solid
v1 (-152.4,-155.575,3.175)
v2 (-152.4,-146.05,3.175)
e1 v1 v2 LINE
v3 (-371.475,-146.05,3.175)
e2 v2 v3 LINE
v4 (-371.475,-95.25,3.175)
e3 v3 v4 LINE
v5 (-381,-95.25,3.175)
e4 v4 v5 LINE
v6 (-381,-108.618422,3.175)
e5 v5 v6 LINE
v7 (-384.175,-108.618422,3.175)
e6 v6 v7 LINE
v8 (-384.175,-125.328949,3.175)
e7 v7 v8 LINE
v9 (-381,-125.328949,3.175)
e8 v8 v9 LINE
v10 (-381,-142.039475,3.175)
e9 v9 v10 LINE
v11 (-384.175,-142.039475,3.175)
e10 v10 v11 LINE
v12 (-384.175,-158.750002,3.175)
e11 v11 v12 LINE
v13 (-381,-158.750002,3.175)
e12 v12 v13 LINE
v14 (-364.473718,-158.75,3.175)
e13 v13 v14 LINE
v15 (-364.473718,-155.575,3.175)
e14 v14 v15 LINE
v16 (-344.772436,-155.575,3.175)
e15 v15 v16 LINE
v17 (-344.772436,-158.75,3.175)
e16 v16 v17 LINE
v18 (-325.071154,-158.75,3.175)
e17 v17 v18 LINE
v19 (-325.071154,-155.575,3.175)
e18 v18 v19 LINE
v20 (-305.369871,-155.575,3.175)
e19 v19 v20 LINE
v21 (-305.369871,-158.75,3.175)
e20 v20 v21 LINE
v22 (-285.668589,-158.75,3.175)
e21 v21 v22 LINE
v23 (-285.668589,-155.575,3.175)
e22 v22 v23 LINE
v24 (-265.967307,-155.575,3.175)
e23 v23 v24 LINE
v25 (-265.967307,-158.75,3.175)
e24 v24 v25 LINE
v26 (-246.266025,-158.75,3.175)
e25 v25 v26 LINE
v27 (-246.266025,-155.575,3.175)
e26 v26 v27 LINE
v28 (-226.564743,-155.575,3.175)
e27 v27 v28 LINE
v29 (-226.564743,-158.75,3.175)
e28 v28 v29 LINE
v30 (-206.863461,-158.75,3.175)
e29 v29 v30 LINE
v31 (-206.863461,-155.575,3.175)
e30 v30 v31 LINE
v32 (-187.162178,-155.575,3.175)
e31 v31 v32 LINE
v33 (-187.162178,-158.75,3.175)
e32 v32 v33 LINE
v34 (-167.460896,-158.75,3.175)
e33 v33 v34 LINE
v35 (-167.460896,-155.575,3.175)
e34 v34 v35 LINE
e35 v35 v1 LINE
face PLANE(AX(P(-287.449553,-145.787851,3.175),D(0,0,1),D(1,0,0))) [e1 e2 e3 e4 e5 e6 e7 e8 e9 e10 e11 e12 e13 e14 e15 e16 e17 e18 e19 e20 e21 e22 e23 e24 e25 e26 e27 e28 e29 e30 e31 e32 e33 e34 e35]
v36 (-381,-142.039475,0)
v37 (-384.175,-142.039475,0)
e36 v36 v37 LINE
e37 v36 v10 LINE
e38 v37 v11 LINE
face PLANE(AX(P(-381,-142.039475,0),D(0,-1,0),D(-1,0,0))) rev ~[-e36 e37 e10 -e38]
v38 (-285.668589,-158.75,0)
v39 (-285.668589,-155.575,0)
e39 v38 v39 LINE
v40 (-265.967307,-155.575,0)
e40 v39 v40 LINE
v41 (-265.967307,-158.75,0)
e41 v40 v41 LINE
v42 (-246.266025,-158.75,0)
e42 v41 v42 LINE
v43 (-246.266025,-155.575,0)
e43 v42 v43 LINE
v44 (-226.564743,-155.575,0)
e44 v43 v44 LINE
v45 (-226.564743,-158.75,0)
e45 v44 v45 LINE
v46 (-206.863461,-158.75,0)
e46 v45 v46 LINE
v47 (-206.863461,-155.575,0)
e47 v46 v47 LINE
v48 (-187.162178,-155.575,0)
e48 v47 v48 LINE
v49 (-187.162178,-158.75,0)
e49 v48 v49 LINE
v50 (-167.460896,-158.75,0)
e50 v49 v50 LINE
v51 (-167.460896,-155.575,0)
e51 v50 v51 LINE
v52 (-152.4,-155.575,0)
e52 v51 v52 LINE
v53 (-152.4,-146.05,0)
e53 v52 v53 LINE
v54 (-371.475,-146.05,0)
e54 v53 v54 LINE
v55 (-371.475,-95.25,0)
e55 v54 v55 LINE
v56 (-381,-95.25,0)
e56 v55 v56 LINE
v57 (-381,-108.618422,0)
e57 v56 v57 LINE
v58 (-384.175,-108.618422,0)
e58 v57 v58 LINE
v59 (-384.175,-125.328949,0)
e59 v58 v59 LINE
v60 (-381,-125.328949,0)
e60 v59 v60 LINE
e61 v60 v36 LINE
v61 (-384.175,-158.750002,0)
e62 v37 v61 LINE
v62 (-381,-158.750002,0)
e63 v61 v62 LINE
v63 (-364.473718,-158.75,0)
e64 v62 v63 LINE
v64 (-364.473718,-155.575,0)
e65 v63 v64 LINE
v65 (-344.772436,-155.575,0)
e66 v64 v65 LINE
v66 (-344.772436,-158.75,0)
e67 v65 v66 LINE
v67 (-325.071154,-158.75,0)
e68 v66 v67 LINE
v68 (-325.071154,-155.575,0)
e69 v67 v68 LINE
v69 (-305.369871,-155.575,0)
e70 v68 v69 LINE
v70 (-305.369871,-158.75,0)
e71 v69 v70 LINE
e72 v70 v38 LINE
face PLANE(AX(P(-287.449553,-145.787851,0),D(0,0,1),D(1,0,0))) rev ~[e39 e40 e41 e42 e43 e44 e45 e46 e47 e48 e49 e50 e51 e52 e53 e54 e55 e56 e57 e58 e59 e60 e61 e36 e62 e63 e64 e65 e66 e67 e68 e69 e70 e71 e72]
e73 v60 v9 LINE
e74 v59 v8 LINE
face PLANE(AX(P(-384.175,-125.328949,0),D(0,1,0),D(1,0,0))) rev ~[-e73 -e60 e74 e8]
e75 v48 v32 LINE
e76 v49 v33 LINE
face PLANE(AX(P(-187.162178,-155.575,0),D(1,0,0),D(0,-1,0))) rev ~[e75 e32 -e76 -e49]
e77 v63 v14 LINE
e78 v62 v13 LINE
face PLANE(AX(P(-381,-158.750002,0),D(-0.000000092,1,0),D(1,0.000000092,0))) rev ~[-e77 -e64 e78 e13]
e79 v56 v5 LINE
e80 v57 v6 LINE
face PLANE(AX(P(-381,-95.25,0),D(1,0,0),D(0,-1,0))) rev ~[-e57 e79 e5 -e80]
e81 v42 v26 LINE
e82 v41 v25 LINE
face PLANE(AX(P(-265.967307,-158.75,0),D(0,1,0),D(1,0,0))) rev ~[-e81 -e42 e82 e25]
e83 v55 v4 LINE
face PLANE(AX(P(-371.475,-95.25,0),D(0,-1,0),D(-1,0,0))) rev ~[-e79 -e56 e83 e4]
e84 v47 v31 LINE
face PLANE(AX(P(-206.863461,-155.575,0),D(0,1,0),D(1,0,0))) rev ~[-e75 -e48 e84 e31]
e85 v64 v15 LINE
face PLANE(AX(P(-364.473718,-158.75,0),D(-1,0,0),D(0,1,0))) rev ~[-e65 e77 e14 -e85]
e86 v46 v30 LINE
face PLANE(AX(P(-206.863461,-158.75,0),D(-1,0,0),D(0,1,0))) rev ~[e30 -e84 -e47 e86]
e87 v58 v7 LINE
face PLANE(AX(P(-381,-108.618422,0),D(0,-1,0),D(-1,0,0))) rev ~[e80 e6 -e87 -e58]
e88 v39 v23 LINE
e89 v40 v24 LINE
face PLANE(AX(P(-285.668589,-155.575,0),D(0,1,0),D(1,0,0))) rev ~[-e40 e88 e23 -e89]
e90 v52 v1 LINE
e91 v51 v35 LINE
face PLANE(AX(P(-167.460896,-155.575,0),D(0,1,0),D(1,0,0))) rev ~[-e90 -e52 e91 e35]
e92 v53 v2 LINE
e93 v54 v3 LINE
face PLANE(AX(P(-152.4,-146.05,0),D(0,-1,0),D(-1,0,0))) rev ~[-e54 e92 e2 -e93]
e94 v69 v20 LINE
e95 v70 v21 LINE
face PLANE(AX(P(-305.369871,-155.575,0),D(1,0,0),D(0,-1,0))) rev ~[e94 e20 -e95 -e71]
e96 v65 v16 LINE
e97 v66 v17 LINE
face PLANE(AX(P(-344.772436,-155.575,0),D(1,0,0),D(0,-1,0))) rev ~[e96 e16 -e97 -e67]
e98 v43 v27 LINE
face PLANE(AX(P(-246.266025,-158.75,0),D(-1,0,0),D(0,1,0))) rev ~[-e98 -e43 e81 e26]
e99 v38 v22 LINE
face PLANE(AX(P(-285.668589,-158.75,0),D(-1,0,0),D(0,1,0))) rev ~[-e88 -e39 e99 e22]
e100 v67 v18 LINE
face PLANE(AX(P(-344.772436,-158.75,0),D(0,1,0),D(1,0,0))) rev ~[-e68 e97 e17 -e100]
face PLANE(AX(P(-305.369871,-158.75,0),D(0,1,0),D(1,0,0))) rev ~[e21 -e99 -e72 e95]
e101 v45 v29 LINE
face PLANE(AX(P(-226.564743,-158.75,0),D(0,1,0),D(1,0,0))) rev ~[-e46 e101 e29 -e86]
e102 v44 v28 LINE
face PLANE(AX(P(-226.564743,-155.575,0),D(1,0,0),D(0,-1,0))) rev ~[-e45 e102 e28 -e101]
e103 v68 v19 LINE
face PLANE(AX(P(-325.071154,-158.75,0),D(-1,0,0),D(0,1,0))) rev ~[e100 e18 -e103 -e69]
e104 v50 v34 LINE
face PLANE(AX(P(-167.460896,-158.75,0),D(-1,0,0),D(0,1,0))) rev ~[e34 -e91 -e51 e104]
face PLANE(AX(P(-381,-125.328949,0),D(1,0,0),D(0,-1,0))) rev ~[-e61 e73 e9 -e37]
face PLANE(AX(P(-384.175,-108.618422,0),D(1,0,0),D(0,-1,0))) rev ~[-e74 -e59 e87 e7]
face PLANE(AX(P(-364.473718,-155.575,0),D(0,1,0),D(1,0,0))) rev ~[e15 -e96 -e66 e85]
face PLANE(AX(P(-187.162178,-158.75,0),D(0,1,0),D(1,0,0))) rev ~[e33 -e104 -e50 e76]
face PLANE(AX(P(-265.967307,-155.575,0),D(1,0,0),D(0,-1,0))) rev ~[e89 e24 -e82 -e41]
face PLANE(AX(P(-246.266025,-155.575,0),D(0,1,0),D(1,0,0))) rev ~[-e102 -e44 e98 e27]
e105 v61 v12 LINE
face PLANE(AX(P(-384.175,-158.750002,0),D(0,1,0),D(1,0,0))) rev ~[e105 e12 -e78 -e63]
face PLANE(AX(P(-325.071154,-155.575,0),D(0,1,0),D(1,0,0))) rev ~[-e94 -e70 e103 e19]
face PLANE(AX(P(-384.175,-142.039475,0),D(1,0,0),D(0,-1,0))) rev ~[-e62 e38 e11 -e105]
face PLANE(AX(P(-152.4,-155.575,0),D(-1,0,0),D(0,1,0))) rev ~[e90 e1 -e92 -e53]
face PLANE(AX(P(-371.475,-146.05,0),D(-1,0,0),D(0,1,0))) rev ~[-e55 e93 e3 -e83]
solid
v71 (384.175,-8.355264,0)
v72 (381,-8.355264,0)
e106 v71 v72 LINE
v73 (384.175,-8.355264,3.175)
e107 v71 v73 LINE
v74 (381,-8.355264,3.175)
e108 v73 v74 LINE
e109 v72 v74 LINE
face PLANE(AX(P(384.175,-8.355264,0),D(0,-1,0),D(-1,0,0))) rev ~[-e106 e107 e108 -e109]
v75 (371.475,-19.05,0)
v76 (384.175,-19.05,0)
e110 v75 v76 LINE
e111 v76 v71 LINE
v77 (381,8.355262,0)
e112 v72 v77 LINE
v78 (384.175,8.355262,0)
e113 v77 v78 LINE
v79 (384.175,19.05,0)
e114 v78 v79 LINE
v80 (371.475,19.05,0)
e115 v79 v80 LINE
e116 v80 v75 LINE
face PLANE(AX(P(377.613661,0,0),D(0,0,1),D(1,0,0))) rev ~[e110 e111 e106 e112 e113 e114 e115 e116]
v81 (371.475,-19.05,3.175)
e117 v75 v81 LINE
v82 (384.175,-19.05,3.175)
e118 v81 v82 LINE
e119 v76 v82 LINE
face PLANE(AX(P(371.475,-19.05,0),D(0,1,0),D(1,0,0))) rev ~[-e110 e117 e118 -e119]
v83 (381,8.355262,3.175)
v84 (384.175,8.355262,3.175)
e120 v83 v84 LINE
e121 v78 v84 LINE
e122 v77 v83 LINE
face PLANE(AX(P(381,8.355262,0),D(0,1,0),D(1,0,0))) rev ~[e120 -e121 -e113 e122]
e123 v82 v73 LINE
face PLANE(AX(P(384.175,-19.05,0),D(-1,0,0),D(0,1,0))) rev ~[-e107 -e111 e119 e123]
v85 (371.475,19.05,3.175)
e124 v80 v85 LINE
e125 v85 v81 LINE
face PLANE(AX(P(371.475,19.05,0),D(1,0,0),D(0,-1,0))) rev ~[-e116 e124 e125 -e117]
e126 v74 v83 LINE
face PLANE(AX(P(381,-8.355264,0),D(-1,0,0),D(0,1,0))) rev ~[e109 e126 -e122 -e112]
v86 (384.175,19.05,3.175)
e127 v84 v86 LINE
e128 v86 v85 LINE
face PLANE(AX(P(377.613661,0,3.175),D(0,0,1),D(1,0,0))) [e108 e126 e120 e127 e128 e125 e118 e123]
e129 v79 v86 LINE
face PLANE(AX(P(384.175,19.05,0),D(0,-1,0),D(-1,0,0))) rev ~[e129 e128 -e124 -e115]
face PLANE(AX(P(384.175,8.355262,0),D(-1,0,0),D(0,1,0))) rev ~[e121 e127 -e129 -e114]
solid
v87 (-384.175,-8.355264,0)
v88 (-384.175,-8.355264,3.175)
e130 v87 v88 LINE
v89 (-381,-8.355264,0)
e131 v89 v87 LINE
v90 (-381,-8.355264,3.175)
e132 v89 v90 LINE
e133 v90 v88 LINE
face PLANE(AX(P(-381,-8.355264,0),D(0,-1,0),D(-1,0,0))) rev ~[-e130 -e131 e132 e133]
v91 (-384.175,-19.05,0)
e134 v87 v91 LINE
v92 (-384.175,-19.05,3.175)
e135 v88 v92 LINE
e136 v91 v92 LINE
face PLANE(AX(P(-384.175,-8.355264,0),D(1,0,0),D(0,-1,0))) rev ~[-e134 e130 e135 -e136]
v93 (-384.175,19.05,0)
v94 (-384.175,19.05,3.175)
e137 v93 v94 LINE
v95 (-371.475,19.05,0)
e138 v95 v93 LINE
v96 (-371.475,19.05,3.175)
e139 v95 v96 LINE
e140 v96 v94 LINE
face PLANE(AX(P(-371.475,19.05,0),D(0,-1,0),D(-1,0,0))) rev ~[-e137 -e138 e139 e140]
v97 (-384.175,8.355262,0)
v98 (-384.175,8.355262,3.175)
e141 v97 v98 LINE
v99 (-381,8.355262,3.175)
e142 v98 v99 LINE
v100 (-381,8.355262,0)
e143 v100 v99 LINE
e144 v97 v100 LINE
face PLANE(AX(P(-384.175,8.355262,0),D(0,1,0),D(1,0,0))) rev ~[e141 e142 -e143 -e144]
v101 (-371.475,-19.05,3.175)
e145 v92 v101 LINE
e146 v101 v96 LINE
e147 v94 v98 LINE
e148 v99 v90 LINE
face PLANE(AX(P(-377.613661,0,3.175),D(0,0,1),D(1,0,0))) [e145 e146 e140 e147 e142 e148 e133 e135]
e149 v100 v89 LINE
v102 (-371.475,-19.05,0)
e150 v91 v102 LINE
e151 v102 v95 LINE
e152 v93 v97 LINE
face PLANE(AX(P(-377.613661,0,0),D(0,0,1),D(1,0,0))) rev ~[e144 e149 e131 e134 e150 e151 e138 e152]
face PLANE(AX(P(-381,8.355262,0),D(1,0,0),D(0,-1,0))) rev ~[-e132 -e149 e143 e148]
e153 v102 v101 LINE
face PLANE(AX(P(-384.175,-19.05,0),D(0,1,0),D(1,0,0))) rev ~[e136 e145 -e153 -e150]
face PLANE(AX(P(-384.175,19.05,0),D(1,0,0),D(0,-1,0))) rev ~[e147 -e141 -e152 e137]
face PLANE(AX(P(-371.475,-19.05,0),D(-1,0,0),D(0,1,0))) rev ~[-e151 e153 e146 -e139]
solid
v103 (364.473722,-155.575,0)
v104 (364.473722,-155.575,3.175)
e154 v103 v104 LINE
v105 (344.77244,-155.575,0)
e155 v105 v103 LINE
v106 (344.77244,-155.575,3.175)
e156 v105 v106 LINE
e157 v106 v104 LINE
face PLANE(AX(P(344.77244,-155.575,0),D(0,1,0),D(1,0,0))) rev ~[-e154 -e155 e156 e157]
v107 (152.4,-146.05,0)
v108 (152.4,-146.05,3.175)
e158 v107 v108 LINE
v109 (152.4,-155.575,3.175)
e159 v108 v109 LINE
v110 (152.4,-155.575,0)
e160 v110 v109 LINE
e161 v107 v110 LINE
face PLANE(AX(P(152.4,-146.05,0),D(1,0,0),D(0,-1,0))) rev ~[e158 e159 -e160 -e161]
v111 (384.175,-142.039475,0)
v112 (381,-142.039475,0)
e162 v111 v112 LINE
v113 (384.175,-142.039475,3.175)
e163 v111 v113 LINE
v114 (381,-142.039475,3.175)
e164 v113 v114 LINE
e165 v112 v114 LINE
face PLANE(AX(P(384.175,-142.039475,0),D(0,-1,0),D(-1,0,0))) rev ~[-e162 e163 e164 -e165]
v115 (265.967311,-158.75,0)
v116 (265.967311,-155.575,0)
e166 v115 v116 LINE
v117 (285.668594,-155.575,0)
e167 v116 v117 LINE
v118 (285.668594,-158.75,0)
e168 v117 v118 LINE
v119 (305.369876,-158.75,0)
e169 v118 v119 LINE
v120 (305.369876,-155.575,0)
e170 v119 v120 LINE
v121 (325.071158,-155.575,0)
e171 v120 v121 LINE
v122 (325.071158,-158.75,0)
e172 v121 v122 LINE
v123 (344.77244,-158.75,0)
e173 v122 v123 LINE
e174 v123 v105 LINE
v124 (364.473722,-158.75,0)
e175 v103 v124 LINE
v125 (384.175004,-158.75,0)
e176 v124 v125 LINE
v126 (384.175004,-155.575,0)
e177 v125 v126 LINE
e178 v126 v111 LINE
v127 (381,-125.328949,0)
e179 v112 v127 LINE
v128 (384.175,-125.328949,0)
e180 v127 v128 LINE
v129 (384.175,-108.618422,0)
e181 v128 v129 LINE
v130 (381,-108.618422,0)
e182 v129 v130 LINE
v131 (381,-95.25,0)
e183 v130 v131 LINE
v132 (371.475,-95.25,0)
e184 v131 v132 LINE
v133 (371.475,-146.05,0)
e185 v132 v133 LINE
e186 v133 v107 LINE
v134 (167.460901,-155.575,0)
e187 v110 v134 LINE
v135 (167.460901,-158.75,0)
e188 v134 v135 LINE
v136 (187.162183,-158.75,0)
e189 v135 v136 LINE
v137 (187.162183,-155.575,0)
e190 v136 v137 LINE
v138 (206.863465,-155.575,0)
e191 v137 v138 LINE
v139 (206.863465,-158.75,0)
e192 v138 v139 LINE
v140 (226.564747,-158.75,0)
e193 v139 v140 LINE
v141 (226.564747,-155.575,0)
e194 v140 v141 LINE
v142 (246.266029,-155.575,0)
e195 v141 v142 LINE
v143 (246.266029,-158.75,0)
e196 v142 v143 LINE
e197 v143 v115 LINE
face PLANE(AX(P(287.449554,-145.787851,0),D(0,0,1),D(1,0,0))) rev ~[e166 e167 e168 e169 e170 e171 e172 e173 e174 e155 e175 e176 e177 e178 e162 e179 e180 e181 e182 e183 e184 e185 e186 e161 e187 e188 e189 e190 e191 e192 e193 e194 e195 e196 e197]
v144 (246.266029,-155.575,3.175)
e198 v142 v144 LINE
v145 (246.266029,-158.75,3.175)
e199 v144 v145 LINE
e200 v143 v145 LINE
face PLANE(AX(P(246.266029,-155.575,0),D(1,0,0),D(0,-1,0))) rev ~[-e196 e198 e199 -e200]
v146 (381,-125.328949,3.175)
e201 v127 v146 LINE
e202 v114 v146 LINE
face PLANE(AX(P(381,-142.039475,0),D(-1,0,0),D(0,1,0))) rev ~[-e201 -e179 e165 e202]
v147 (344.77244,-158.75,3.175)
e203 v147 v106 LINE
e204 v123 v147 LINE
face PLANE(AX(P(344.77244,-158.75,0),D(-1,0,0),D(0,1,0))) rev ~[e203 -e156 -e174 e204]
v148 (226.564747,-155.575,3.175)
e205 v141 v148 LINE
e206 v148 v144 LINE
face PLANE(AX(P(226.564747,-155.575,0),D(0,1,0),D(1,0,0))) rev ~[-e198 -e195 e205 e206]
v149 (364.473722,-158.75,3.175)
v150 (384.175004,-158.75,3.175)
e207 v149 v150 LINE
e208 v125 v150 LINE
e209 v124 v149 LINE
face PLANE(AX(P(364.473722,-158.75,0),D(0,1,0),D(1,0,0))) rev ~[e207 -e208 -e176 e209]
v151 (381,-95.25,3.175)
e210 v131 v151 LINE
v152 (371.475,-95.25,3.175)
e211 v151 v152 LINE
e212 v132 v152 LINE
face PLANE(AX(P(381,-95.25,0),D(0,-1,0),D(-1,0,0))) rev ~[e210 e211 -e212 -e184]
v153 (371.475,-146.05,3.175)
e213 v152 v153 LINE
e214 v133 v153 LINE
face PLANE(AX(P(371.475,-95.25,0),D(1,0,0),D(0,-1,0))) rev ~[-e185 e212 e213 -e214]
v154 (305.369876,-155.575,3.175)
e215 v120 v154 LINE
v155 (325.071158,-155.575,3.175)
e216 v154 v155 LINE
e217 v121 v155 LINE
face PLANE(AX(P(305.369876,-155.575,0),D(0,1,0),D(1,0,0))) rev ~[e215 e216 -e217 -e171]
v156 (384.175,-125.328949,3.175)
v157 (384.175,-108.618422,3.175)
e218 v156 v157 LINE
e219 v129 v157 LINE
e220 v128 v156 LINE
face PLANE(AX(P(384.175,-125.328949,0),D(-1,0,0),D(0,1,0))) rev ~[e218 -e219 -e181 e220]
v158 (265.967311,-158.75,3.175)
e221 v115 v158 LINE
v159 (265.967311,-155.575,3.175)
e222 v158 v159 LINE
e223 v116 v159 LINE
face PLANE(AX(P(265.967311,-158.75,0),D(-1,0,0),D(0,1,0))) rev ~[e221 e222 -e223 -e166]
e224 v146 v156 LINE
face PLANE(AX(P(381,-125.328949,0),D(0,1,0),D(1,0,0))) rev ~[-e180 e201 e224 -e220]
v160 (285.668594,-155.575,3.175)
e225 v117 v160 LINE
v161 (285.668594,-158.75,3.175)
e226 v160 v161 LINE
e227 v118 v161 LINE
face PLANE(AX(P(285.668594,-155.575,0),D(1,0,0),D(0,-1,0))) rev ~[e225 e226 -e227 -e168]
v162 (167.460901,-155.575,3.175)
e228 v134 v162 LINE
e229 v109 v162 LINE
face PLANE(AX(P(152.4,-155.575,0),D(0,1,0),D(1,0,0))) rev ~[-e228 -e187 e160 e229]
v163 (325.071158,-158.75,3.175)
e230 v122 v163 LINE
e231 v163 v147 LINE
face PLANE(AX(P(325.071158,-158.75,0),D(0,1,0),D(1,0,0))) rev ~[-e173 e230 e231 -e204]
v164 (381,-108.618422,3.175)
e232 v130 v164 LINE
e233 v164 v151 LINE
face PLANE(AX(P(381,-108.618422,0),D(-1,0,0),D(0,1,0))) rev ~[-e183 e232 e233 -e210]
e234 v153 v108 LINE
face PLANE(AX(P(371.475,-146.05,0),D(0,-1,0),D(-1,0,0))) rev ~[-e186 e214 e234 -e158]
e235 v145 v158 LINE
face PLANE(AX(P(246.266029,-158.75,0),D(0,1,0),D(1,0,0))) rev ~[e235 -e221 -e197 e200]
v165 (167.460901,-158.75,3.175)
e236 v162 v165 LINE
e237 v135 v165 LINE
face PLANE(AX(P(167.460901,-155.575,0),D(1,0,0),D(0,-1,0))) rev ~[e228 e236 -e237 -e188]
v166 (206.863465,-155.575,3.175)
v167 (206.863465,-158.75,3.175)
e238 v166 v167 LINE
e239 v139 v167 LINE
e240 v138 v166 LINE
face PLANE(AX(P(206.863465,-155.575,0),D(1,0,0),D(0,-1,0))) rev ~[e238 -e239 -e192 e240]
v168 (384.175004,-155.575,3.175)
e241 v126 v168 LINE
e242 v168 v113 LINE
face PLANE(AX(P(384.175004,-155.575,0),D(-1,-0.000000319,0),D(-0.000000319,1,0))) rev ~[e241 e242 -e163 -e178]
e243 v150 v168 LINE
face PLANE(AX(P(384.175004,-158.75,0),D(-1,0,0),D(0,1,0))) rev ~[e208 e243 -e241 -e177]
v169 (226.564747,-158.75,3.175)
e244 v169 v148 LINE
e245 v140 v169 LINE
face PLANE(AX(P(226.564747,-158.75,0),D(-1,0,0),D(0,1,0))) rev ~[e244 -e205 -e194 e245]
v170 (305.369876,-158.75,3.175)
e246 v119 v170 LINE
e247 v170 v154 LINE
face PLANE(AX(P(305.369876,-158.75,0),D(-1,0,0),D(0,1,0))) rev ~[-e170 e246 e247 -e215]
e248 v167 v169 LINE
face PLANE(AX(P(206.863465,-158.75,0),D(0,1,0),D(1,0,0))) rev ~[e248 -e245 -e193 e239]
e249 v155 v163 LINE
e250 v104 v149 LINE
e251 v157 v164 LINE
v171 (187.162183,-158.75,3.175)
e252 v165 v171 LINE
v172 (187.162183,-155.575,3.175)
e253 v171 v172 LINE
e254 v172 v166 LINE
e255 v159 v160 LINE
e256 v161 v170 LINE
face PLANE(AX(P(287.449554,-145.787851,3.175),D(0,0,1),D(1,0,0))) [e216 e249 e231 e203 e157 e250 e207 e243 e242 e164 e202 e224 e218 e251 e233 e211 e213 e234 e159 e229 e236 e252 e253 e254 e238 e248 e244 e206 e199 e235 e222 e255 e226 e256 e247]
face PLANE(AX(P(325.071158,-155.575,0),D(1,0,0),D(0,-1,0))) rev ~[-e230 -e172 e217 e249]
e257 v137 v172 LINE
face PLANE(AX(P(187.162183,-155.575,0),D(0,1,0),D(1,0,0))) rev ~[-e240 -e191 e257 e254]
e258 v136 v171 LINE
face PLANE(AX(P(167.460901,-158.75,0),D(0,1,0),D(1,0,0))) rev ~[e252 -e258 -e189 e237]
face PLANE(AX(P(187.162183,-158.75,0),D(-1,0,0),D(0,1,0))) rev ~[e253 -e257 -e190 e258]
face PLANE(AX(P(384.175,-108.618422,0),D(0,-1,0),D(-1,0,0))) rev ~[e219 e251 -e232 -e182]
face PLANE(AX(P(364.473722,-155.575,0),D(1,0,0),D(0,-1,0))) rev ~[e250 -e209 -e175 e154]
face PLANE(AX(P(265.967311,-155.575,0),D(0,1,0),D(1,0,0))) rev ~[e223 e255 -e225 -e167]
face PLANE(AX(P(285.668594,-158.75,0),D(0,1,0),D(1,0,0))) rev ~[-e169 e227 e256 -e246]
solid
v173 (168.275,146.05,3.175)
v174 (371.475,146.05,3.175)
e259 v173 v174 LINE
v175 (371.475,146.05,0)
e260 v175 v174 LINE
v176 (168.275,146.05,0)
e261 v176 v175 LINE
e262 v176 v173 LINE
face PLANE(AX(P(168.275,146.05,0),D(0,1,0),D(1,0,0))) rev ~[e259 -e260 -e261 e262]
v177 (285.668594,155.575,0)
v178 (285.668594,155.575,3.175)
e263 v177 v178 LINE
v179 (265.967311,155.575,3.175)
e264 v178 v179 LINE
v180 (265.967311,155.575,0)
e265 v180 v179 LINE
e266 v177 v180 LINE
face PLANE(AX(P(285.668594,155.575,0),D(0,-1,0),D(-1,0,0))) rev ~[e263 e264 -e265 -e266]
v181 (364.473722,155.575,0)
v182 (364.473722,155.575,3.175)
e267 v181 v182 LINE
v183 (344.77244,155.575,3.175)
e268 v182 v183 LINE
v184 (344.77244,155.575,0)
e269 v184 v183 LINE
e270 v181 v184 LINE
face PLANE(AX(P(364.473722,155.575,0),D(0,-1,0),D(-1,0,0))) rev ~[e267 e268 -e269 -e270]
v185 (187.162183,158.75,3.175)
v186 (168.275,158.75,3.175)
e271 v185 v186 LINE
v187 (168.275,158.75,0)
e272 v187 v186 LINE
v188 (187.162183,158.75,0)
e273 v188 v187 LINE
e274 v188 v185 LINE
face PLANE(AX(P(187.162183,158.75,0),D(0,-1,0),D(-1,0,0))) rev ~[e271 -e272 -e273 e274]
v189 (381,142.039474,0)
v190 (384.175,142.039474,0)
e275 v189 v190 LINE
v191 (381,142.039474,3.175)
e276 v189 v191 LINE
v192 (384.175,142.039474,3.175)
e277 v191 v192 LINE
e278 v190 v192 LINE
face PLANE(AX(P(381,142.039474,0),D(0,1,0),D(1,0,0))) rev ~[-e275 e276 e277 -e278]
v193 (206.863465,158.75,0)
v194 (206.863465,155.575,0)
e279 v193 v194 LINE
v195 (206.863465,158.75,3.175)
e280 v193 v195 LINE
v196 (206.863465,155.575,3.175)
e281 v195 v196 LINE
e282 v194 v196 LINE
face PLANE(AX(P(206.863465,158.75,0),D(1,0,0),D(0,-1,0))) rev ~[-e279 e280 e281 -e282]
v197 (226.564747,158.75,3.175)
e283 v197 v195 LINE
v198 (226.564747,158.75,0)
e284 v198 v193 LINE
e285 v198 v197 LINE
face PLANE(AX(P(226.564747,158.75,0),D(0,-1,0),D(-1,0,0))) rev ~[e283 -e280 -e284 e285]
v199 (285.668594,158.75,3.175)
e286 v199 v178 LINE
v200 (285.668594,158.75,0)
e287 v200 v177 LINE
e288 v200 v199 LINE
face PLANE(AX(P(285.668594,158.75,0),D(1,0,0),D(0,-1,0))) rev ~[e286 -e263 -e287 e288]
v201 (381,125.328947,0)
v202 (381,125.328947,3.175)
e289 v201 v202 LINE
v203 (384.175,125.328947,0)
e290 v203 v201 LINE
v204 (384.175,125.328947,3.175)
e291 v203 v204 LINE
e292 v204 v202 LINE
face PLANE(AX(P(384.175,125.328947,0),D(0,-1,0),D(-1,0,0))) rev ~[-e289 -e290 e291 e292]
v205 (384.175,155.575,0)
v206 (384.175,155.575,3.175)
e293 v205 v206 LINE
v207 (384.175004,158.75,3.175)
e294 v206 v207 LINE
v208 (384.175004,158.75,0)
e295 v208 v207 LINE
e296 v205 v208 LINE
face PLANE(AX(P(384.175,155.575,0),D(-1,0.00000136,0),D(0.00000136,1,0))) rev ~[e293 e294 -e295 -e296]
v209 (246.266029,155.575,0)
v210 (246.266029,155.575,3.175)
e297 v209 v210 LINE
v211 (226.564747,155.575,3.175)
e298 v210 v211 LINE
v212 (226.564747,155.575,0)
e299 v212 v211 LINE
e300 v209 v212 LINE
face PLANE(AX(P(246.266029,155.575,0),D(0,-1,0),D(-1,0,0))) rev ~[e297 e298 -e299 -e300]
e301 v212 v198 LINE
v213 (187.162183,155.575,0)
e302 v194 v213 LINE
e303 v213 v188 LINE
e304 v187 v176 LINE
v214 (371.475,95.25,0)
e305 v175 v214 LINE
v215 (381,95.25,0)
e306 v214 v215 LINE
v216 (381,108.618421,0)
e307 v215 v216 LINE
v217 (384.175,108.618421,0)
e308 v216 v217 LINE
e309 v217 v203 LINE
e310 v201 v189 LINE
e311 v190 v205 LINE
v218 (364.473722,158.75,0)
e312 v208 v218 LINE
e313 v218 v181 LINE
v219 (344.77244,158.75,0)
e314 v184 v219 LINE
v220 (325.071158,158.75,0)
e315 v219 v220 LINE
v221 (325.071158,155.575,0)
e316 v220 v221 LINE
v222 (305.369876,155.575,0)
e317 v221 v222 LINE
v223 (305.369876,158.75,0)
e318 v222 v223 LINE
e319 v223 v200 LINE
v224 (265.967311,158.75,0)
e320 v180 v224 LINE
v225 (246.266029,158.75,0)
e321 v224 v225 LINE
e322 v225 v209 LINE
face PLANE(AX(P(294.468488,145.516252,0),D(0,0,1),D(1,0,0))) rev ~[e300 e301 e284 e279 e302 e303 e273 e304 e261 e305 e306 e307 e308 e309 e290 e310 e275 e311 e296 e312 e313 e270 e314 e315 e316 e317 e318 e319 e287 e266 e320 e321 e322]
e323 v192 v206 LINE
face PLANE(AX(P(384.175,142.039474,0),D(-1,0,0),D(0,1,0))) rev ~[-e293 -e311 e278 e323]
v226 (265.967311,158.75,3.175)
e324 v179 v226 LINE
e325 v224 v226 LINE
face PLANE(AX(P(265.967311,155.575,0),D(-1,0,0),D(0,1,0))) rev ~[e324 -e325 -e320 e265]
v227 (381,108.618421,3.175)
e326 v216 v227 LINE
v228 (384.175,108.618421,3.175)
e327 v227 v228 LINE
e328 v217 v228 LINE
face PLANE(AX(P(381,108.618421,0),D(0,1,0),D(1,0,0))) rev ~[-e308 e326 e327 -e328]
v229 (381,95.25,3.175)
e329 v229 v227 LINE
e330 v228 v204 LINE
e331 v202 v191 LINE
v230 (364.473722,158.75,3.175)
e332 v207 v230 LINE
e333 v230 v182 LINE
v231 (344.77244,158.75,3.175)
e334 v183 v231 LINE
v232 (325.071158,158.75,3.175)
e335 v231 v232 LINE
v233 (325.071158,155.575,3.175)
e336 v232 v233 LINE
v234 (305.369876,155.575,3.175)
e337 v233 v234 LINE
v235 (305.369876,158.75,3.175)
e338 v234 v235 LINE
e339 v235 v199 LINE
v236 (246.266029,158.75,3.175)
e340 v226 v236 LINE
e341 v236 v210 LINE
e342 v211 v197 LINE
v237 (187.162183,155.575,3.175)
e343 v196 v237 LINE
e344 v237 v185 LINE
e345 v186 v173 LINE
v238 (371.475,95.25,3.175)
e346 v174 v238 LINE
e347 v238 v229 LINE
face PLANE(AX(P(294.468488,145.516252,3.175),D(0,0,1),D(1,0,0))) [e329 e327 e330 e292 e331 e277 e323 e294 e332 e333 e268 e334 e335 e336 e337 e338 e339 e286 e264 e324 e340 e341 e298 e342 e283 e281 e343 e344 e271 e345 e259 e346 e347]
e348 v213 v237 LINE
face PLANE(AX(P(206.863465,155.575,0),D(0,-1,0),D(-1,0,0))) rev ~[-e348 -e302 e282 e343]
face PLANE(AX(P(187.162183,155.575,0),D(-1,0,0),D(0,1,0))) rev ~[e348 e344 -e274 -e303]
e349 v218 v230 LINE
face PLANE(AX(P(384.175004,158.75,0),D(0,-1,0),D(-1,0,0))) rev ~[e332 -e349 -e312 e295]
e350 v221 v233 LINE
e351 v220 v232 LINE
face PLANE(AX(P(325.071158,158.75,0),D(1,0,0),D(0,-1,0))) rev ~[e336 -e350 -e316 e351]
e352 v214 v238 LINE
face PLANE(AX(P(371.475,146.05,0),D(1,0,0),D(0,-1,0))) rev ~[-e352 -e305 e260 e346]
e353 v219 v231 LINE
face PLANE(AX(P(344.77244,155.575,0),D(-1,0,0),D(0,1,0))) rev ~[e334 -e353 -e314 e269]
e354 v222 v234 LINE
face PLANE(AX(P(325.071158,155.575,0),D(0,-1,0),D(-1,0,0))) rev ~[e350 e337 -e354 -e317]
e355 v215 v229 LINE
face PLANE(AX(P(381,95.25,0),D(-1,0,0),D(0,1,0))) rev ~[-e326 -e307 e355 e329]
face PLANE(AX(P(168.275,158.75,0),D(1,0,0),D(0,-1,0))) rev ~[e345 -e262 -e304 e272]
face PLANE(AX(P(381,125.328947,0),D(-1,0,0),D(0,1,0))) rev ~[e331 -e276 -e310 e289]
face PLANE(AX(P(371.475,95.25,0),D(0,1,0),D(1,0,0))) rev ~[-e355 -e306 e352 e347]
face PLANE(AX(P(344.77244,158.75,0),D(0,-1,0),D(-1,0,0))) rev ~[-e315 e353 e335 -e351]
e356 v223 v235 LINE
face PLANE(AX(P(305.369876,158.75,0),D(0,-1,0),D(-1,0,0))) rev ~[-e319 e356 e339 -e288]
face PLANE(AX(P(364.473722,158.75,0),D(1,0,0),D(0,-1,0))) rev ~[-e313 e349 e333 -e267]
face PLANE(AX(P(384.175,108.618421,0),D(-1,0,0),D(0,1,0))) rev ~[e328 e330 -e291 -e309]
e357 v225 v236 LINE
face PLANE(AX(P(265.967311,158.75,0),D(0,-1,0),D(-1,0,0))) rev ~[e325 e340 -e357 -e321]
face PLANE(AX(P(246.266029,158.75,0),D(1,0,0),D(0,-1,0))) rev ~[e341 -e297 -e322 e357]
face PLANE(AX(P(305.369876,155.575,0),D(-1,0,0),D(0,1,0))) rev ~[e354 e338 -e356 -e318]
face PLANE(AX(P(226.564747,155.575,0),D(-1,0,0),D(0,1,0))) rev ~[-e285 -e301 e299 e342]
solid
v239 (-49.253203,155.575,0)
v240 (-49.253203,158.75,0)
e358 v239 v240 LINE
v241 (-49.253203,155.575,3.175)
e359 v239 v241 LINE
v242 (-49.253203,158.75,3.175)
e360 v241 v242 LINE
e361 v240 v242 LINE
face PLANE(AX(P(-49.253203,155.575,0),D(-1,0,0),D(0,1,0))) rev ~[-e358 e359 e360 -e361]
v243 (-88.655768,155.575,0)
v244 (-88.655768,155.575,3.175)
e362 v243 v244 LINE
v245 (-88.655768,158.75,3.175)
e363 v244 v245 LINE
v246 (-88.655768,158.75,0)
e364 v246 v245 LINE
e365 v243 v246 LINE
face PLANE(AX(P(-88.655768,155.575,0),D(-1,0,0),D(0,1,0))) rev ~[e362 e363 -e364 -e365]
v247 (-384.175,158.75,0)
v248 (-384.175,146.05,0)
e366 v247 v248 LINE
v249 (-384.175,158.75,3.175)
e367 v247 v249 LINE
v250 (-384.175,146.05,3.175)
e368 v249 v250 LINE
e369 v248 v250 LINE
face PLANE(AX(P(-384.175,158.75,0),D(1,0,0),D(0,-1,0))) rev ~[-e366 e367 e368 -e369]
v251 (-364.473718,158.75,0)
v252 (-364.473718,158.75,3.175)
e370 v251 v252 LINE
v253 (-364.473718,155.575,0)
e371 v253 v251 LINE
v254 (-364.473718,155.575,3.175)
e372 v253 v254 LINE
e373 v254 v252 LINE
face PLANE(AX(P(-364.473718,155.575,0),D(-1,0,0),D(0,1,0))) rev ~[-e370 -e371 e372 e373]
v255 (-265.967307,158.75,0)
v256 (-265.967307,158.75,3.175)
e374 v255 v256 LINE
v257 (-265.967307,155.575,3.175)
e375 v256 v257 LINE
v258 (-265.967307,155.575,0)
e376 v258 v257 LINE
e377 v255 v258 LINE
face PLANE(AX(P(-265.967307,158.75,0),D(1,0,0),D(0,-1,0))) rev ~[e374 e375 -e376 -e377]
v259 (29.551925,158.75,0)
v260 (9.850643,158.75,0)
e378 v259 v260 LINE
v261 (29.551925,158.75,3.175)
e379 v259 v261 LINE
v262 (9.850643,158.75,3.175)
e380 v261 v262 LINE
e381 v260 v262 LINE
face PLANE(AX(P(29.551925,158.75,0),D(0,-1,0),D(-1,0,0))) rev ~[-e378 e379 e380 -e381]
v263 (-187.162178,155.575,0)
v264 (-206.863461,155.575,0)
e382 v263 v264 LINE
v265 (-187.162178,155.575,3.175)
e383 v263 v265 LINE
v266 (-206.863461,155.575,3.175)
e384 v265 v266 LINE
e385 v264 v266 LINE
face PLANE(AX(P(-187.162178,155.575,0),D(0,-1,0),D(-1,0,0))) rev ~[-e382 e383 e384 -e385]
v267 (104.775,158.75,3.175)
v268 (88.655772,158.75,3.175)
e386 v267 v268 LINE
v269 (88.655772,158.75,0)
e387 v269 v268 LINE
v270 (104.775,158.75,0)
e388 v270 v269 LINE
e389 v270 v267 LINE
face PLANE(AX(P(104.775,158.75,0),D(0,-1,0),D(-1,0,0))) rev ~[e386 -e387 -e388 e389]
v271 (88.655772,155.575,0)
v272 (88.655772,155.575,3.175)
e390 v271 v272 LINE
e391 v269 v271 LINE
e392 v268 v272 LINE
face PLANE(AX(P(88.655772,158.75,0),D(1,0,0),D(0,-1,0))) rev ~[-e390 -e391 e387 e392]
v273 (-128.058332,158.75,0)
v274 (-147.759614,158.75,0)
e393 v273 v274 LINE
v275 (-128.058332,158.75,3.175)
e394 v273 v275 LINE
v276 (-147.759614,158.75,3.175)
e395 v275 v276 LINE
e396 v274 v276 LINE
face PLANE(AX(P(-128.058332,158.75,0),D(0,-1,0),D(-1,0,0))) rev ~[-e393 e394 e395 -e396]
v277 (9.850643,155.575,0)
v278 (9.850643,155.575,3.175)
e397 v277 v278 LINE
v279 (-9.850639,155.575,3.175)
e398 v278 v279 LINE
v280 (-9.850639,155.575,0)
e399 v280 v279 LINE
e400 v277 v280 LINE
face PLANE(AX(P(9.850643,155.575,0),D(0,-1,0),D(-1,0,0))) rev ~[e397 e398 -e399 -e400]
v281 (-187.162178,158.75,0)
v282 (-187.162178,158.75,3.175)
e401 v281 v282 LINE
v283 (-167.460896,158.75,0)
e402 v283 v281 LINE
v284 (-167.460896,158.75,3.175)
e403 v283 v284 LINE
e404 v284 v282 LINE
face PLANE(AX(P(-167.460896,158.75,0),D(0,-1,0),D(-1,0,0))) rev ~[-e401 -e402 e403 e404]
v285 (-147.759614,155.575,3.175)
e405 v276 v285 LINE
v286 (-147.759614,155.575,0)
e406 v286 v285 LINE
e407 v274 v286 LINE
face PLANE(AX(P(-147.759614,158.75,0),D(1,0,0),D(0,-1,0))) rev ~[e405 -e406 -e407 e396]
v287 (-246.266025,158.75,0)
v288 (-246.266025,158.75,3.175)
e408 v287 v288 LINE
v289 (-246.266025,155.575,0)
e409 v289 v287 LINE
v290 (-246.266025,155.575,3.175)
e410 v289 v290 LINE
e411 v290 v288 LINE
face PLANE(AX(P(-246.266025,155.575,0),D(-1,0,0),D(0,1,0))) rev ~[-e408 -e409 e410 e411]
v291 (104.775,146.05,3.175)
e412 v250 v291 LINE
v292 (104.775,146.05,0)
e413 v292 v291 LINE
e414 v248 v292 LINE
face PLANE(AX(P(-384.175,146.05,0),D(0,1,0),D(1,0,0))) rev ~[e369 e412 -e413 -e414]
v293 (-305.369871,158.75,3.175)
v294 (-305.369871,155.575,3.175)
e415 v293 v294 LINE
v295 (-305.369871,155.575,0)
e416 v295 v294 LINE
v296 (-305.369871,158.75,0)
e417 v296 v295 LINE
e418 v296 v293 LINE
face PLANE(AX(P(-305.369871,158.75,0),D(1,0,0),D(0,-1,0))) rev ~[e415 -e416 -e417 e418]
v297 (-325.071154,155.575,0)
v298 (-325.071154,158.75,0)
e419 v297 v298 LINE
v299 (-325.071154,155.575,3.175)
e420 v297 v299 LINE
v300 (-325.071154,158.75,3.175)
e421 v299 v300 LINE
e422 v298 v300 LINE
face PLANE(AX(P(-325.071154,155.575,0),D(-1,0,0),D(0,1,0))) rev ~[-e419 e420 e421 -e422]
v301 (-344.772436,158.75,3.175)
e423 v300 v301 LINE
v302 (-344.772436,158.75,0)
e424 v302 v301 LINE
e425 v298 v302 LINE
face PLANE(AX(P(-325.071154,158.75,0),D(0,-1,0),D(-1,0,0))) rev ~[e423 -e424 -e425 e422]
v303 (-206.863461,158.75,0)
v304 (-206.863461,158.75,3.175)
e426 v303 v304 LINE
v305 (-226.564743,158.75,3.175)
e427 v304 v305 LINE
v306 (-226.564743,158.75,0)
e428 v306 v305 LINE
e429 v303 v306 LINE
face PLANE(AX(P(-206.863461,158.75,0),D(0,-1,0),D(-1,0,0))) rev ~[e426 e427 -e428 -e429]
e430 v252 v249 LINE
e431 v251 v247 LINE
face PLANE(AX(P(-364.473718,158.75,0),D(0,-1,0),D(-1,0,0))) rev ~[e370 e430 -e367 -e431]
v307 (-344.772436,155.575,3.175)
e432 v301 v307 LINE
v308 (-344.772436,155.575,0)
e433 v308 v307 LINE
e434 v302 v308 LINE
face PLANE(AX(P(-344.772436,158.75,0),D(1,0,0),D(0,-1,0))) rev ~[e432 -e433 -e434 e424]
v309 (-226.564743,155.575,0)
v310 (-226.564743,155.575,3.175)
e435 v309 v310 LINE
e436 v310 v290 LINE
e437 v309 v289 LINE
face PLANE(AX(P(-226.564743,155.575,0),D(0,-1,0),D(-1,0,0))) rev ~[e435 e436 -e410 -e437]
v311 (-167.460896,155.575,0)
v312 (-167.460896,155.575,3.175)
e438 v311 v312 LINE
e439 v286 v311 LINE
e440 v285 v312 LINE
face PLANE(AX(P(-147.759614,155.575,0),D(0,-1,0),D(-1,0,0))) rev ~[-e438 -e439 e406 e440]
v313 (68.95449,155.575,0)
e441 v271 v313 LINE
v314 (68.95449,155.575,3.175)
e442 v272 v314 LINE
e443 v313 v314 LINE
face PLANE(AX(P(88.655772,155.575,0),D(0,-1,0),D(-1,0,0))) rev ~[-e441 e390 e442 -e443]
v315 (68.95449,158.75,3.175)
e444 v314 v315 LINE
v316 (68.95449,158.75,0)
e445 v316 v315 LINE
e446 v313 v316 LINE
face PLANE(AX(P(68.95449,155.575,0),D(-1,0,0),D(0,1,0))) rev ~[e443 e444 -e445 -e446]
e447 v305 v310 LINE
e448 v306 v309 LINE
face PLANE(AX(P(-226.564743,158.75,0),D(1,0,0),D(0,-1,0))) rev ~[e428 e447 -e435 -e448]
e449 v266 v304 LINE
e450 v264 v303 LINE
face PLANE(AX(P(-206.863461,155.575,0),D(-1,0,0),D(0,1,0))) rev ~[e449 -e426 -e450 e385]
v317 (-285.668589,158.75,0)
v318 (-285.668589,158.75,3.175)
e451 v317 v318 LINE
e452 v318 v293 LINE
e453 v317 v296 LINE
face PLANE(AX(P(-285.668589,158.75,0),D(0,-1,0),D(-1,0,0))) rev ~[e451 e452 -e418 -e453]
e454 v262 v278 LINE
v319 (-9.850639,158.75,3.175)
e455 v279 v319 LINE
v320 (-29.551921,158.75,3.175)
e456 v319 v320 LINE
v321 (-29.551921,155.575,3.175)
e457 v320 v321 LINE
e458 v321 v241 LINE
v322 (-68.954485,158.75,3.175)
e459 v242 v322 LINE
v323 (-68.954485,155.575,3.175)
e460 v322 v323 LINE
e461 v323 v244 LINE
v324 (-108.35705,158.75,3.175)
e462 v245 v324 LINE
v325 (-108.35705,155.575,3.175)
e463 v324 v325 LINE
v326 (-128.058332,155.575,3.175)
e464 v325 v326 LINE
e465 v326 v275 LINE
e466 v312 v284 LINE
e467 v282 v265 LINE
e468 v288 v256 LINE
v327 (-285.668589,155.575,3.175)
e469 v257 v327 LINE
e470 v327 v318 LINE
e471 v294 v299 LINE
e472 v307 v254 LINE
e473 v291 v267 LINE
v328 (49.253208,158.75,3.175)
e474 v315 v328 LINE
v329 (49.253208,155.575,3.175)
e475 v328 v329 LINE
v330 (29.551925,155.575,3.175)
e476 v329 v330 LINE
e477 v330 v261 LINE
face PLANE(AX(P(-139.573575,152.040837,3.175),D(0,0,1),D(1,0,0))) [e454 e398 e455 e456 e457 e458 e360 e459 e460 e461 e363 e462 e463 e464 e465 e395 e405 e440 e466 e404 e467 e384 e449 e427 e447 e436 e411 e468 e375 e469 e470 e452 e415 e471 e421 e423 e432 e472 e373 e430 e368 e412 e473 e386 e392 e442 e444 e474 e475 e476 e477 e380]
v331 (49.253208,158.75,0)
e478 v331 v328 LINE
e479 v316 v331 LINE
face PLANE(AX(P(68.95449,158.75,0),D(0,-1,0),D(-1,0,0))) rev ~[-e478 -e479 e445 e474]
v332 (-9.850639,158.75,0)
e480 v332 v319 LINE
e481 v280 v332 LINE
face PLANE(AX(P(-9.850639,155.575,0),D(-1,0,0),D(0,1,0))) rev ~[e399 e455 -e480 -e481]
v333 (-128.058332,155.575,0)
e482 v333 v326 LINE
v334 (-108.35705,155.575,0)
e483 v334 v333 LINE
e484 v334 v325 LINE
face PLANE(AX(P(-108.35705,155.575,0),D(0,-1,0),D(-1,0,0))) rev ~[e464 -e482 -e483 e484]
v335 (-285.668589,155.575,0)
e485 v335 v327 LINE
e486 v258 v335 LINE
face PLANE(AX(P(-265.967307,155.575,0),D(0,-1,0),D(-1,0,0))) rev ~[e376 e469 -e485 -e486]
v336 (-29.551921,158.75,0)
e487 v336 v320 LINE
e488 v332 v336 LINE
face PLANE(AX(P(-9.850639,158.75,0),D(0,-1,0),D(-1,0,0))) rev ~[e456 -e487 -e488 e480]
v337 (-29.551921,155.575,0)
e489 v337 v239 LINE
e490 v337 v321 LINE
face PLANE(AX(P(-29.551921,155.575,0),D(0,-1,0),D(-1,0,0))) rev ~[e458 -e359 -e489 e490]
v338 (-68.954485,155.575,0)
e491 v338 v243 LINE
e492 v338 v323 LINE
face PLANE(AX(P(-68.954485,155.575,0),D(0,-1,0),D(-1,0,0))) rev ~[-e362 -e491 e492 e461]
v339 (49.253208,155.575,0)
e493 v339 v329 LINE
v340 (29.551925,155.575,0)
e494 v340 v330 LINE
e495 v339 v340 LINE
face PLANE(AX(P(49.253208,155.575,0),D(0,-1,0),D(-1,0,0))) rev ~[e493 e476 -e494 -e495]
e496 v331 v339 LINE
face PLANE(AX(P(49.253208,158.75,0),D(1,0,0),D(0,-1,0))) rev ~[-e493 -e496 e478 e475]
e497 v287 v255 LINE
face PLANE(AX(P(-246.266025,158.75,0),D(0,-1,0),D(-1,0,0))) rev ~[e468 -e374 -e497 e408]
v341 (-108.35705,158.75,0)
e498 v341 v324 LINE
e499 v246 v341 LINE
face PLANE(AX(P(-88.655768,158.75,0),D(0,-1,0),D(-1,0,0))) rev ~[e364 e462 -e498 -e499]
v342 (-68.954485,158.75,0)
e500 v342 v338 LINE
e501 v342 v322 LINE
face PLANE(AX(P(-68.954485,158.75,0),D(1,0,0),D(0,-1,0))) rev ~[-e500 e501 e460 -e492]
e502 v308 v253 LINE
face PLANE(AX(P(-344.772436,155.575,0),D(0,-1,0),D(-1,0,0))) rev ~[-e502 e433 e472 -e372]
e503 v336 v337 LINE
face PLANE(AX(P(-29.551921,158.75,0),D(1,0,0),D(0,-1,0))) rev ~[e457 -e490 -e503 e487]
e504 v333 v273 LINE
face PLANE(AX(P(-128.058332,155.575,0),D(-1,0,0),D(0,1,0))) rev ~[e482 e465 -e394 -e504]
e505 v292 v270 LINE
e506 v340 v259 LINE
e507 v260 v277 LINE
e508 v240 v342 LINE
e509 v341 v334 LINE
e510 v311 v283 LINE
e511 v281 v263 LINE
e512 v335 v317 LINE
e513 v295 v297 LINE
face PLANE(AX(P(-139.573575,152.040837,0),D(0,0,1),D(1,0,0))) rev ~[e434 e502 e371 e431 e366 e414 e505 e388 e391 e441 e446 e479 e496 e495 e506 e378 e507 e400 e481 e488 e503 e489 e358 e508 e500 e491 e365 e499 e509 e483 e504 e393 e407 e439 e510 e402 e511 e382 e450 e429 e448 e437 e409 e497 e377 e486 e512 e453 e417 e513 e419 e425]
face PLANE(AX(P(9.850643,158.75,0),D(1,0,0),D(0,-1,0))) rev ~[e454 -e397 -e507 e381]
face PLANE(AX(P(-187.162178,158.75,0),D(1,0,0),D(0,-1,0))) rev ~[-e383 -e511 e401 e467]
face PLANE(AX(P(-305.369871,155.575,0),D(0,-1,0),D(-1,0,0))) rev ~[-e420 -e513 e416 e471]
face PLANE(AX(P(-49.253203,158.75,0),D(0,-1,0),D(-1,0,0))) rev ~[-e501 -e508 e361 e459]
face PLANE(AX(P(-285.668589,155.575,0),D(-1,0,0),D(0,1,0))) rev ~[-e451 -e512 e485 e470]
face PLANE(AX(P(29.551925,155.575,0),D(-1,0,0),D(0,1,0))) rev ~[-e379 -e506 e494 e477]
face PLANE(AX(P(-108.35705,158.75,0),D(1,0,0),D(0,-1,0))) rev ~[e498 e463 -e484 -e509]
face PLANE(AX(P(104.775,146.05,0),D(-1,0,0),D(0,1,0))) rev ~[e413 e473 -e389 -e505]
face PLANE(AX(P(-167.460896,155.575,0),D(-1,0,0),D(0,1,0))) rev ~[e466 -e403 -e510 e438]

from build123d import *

# Parameters (mm, degrees)
F1_DEPTH = 3.175


# Not quite as in the source:
# - ends of sketch curves that miss each other by under 0.0002 mm in the source are joined


with BuildPart() as f1:
    # F0 (on Top) → F1 (new body)
    with BuildSketch(Plane.XY):
        Polygon((168.275, 158.75), (168.275, 146.05), (371.475, 146.05), (371.475, 95.25), (381, 95.25), (381, 108.618420812), (384.175, 108.618420812), (384.175, 125.328947208), (381, 125.328947208), (381, 142.039473604), (384.175, 142.039473604), (384.175, 155.575), (384.175004318, 158.75), (364.473722156, 158.75), (364.473722156, 155.575), (344.772439994, 155.575), (344.772439994, 158.75), (325.071157832, 158.75), (325.071157832, 155.575), (305.36987567, 155.575), (305.36987567, 158.75), (285.668593508, 158.75), (285.668593508, 155.575), (268.605, 155.575), (265.967311346, 155.575), (265.967311346, 158.75), (246.266029184, 158.75), (246.266029184, 155.575), (226.564747022, 155.575), (226.564747022, 158.75), (206.86346486, 158.75), (206.86346486, 155.575), (187.162182698, 155.575), (187.162182698, 158.75), align=None)
    extrude(amount=F1_DEPTH)


with BuildPart() as f1b:
    # F0 (on Top) → F1, piece 2 (new body)
    with BuildSketch(Plane.XY):
        Polygon((-364.473717838, 158.75), (-384.175, 158.75), (-384.175, 146.05), (-371.475, 146.05), (-317.7820146084, 146.05), (104.775, 146.05), (104.775, 158.75), (88.655771888, 158.75), (88.655771888, 155.575), (68.954489726, 155.575), (68.954489726, 158.75), (49.253207564, 158.75), (49.253207564, 155.575), (29.551925402, 155.575), (29.551925402, 158.75), (9.85064324, 158.75), (9.85064324, 155.575), (-9.850638922, 155.575), (-9.850638922, 158.75), (-29.551921084, 158.75), (-29.551921084, 155.575), (-49.253203246, 155.575), (-49.253203246, 158.75), (-68.954485408, 158.75), (-68.954485408, 155.575), (-88.65576757, 155.575), (-88.65576757, 158.75), (-108.357049732, 158.75), (-108.357049732, 155.575), (-128.058331894, 155.575), (-128.058331894, 158.75), (-147.759614056, 158.75), (-147.759614056, 155.575), (-167.460896218, 155.575), (-167.460896218, 158.75), (-187.16217838, 158.75), (-187.16217838, 155.575), (-206.863460542, 155.575), (-206.863460542, 158.75), (-226.564742704, 158.75), (-226.564742704, 155.575), (-246.266024866, 155.575), (-246.266024866, 158.75), (-265.967307028, 158.75), (-265.967307028, 155.575), (-285.66858919, 155.575), (-285.66858919, 158.75), (-305.369871352, 158.75), (-305.369871352, 155.575), (-325.071153514, 155.575), (-325.071153514, 158.75), (-344.772435676, 158.75), (-344.772435676, 155.575), (-364.473717838, 155.575), align=None)
    extrude(amount=F1_DEPTH)


with BuildPart() as f1c:
    # F0 (on Top) → F1, piece 3 (new body)
    with BuildSketch(Plane.XY):
        Polygon((-371.475, -19.05), (-371.475, 19.05), (-384.175, 19.05), (-384.175, 8.355262436), (-381, 8.355262436), (-381, -8.35526396), (-384.175, -8.35526396), (-384.175, -19.05), align=None)
    extrude(amount=F1_DEPTH)


with BuildPart() as f1d:
    # F0 (on Top) → F1, piece 4 (new body)
    with BuildSketch(Plane.XY):
        Polygon((-371.475, -146.05), (-371.475, -95.25), (-381, -95.25), (-381, -108.618422336), (-384.175, -108.618422336), (-384.175, -125.328948732), (-381, -125.328948732), (-381, -142.039475128), (-384.175, -142.039475128), (-384.175, -158.750001524), (-381, -158.750001524), (-364.473717838, -158.75), (-364.473717838, -155.575), (-344.772435676, -155.575), (-344.772435676, -158.75), (-325.071153514, -158.75), (-325.071153514, -155.575), (-305.369871352, -155.575), (-305.369871352, -158.75), (-285.66858919, -158.75), (-285.66858919, -155.575), (-265.967307028, -155.575), (-265.967307028, -158.75), (-246.266024866, -158.75), (-246.266024866, -155.575), (-226.564742704, -155.575), (-226.564742704, -158.75), (-206.863460542, -158.75), (-206.863460542, -155.575), (-187.16217838, -155.575), (-187.16217838, -158.75), (-167.460896218, -158.75), (-167.460896218, -155.575), (-152.4, -155.575), (-152.4, -146.05), align=None)
    extrude(amount=F1_DEPTH)


with BuildPart() as f1e:
    # F0 (on Top) → F1, piece 5 (new body)
    with BuildSketch(Plane.XY):
        Polygon((384.175, 19.05), (371.475, 19.05), (371.475, -19.05), (384.175, -19.05), (384.175, -8.35526396), (381, -8.35526396), (381, 8.355262436), (384.175, 8.355262436), align=None)
    extrude(amount=F1_DEPTH)


with BuildPart() as f1f:
    # F0 (on Top) → F1, piece 6 (new body)
    with BuildSketch(Plane.XY):
        Polygon((371.475, -146.05), (152.4, -146.05), (152.4, -155.575), (167.460900536, -155.575), (167.460900536, -158.75), (187.162182698, -158.75), (187.162182698, -155.575), (206.86346486, -155.575), (206.86346486, -158.75), (226.564747022, -158.75), (226.564747022, -155.575), (246.266029184, -155.575), (246.266029184, -158.75), (265.967311346, -158.75), (265.967311346, -155.575), (285.668593508, -155.575), (285.668593508, -158.75), (305.36987567, -158.75), (305.36987567, -155.575), (325.071157832, -155.575), (325.071157832, -158.75), (344.772439994, -158.75), (344.772439994, -155.575), (364.473722156, -155.575), (364.473722156, -158.75), (381, -158.75), (384.175004318, -158.75), (384.175004318, -155.575), (384.175, -142.039475128), (381, -142.039475128), (381, -125.328948732), (384.175, -125.328948732), (384.175, -108.618422336), (381, -108.618422336), (381, -95.25), (371.475, -95.25), align=None)
    extrude(amount=F1_DEPTH)


solid = Compound([f1.part, f1b.part, f1c.part, f1d.part, f1e.part, f1f.part])
